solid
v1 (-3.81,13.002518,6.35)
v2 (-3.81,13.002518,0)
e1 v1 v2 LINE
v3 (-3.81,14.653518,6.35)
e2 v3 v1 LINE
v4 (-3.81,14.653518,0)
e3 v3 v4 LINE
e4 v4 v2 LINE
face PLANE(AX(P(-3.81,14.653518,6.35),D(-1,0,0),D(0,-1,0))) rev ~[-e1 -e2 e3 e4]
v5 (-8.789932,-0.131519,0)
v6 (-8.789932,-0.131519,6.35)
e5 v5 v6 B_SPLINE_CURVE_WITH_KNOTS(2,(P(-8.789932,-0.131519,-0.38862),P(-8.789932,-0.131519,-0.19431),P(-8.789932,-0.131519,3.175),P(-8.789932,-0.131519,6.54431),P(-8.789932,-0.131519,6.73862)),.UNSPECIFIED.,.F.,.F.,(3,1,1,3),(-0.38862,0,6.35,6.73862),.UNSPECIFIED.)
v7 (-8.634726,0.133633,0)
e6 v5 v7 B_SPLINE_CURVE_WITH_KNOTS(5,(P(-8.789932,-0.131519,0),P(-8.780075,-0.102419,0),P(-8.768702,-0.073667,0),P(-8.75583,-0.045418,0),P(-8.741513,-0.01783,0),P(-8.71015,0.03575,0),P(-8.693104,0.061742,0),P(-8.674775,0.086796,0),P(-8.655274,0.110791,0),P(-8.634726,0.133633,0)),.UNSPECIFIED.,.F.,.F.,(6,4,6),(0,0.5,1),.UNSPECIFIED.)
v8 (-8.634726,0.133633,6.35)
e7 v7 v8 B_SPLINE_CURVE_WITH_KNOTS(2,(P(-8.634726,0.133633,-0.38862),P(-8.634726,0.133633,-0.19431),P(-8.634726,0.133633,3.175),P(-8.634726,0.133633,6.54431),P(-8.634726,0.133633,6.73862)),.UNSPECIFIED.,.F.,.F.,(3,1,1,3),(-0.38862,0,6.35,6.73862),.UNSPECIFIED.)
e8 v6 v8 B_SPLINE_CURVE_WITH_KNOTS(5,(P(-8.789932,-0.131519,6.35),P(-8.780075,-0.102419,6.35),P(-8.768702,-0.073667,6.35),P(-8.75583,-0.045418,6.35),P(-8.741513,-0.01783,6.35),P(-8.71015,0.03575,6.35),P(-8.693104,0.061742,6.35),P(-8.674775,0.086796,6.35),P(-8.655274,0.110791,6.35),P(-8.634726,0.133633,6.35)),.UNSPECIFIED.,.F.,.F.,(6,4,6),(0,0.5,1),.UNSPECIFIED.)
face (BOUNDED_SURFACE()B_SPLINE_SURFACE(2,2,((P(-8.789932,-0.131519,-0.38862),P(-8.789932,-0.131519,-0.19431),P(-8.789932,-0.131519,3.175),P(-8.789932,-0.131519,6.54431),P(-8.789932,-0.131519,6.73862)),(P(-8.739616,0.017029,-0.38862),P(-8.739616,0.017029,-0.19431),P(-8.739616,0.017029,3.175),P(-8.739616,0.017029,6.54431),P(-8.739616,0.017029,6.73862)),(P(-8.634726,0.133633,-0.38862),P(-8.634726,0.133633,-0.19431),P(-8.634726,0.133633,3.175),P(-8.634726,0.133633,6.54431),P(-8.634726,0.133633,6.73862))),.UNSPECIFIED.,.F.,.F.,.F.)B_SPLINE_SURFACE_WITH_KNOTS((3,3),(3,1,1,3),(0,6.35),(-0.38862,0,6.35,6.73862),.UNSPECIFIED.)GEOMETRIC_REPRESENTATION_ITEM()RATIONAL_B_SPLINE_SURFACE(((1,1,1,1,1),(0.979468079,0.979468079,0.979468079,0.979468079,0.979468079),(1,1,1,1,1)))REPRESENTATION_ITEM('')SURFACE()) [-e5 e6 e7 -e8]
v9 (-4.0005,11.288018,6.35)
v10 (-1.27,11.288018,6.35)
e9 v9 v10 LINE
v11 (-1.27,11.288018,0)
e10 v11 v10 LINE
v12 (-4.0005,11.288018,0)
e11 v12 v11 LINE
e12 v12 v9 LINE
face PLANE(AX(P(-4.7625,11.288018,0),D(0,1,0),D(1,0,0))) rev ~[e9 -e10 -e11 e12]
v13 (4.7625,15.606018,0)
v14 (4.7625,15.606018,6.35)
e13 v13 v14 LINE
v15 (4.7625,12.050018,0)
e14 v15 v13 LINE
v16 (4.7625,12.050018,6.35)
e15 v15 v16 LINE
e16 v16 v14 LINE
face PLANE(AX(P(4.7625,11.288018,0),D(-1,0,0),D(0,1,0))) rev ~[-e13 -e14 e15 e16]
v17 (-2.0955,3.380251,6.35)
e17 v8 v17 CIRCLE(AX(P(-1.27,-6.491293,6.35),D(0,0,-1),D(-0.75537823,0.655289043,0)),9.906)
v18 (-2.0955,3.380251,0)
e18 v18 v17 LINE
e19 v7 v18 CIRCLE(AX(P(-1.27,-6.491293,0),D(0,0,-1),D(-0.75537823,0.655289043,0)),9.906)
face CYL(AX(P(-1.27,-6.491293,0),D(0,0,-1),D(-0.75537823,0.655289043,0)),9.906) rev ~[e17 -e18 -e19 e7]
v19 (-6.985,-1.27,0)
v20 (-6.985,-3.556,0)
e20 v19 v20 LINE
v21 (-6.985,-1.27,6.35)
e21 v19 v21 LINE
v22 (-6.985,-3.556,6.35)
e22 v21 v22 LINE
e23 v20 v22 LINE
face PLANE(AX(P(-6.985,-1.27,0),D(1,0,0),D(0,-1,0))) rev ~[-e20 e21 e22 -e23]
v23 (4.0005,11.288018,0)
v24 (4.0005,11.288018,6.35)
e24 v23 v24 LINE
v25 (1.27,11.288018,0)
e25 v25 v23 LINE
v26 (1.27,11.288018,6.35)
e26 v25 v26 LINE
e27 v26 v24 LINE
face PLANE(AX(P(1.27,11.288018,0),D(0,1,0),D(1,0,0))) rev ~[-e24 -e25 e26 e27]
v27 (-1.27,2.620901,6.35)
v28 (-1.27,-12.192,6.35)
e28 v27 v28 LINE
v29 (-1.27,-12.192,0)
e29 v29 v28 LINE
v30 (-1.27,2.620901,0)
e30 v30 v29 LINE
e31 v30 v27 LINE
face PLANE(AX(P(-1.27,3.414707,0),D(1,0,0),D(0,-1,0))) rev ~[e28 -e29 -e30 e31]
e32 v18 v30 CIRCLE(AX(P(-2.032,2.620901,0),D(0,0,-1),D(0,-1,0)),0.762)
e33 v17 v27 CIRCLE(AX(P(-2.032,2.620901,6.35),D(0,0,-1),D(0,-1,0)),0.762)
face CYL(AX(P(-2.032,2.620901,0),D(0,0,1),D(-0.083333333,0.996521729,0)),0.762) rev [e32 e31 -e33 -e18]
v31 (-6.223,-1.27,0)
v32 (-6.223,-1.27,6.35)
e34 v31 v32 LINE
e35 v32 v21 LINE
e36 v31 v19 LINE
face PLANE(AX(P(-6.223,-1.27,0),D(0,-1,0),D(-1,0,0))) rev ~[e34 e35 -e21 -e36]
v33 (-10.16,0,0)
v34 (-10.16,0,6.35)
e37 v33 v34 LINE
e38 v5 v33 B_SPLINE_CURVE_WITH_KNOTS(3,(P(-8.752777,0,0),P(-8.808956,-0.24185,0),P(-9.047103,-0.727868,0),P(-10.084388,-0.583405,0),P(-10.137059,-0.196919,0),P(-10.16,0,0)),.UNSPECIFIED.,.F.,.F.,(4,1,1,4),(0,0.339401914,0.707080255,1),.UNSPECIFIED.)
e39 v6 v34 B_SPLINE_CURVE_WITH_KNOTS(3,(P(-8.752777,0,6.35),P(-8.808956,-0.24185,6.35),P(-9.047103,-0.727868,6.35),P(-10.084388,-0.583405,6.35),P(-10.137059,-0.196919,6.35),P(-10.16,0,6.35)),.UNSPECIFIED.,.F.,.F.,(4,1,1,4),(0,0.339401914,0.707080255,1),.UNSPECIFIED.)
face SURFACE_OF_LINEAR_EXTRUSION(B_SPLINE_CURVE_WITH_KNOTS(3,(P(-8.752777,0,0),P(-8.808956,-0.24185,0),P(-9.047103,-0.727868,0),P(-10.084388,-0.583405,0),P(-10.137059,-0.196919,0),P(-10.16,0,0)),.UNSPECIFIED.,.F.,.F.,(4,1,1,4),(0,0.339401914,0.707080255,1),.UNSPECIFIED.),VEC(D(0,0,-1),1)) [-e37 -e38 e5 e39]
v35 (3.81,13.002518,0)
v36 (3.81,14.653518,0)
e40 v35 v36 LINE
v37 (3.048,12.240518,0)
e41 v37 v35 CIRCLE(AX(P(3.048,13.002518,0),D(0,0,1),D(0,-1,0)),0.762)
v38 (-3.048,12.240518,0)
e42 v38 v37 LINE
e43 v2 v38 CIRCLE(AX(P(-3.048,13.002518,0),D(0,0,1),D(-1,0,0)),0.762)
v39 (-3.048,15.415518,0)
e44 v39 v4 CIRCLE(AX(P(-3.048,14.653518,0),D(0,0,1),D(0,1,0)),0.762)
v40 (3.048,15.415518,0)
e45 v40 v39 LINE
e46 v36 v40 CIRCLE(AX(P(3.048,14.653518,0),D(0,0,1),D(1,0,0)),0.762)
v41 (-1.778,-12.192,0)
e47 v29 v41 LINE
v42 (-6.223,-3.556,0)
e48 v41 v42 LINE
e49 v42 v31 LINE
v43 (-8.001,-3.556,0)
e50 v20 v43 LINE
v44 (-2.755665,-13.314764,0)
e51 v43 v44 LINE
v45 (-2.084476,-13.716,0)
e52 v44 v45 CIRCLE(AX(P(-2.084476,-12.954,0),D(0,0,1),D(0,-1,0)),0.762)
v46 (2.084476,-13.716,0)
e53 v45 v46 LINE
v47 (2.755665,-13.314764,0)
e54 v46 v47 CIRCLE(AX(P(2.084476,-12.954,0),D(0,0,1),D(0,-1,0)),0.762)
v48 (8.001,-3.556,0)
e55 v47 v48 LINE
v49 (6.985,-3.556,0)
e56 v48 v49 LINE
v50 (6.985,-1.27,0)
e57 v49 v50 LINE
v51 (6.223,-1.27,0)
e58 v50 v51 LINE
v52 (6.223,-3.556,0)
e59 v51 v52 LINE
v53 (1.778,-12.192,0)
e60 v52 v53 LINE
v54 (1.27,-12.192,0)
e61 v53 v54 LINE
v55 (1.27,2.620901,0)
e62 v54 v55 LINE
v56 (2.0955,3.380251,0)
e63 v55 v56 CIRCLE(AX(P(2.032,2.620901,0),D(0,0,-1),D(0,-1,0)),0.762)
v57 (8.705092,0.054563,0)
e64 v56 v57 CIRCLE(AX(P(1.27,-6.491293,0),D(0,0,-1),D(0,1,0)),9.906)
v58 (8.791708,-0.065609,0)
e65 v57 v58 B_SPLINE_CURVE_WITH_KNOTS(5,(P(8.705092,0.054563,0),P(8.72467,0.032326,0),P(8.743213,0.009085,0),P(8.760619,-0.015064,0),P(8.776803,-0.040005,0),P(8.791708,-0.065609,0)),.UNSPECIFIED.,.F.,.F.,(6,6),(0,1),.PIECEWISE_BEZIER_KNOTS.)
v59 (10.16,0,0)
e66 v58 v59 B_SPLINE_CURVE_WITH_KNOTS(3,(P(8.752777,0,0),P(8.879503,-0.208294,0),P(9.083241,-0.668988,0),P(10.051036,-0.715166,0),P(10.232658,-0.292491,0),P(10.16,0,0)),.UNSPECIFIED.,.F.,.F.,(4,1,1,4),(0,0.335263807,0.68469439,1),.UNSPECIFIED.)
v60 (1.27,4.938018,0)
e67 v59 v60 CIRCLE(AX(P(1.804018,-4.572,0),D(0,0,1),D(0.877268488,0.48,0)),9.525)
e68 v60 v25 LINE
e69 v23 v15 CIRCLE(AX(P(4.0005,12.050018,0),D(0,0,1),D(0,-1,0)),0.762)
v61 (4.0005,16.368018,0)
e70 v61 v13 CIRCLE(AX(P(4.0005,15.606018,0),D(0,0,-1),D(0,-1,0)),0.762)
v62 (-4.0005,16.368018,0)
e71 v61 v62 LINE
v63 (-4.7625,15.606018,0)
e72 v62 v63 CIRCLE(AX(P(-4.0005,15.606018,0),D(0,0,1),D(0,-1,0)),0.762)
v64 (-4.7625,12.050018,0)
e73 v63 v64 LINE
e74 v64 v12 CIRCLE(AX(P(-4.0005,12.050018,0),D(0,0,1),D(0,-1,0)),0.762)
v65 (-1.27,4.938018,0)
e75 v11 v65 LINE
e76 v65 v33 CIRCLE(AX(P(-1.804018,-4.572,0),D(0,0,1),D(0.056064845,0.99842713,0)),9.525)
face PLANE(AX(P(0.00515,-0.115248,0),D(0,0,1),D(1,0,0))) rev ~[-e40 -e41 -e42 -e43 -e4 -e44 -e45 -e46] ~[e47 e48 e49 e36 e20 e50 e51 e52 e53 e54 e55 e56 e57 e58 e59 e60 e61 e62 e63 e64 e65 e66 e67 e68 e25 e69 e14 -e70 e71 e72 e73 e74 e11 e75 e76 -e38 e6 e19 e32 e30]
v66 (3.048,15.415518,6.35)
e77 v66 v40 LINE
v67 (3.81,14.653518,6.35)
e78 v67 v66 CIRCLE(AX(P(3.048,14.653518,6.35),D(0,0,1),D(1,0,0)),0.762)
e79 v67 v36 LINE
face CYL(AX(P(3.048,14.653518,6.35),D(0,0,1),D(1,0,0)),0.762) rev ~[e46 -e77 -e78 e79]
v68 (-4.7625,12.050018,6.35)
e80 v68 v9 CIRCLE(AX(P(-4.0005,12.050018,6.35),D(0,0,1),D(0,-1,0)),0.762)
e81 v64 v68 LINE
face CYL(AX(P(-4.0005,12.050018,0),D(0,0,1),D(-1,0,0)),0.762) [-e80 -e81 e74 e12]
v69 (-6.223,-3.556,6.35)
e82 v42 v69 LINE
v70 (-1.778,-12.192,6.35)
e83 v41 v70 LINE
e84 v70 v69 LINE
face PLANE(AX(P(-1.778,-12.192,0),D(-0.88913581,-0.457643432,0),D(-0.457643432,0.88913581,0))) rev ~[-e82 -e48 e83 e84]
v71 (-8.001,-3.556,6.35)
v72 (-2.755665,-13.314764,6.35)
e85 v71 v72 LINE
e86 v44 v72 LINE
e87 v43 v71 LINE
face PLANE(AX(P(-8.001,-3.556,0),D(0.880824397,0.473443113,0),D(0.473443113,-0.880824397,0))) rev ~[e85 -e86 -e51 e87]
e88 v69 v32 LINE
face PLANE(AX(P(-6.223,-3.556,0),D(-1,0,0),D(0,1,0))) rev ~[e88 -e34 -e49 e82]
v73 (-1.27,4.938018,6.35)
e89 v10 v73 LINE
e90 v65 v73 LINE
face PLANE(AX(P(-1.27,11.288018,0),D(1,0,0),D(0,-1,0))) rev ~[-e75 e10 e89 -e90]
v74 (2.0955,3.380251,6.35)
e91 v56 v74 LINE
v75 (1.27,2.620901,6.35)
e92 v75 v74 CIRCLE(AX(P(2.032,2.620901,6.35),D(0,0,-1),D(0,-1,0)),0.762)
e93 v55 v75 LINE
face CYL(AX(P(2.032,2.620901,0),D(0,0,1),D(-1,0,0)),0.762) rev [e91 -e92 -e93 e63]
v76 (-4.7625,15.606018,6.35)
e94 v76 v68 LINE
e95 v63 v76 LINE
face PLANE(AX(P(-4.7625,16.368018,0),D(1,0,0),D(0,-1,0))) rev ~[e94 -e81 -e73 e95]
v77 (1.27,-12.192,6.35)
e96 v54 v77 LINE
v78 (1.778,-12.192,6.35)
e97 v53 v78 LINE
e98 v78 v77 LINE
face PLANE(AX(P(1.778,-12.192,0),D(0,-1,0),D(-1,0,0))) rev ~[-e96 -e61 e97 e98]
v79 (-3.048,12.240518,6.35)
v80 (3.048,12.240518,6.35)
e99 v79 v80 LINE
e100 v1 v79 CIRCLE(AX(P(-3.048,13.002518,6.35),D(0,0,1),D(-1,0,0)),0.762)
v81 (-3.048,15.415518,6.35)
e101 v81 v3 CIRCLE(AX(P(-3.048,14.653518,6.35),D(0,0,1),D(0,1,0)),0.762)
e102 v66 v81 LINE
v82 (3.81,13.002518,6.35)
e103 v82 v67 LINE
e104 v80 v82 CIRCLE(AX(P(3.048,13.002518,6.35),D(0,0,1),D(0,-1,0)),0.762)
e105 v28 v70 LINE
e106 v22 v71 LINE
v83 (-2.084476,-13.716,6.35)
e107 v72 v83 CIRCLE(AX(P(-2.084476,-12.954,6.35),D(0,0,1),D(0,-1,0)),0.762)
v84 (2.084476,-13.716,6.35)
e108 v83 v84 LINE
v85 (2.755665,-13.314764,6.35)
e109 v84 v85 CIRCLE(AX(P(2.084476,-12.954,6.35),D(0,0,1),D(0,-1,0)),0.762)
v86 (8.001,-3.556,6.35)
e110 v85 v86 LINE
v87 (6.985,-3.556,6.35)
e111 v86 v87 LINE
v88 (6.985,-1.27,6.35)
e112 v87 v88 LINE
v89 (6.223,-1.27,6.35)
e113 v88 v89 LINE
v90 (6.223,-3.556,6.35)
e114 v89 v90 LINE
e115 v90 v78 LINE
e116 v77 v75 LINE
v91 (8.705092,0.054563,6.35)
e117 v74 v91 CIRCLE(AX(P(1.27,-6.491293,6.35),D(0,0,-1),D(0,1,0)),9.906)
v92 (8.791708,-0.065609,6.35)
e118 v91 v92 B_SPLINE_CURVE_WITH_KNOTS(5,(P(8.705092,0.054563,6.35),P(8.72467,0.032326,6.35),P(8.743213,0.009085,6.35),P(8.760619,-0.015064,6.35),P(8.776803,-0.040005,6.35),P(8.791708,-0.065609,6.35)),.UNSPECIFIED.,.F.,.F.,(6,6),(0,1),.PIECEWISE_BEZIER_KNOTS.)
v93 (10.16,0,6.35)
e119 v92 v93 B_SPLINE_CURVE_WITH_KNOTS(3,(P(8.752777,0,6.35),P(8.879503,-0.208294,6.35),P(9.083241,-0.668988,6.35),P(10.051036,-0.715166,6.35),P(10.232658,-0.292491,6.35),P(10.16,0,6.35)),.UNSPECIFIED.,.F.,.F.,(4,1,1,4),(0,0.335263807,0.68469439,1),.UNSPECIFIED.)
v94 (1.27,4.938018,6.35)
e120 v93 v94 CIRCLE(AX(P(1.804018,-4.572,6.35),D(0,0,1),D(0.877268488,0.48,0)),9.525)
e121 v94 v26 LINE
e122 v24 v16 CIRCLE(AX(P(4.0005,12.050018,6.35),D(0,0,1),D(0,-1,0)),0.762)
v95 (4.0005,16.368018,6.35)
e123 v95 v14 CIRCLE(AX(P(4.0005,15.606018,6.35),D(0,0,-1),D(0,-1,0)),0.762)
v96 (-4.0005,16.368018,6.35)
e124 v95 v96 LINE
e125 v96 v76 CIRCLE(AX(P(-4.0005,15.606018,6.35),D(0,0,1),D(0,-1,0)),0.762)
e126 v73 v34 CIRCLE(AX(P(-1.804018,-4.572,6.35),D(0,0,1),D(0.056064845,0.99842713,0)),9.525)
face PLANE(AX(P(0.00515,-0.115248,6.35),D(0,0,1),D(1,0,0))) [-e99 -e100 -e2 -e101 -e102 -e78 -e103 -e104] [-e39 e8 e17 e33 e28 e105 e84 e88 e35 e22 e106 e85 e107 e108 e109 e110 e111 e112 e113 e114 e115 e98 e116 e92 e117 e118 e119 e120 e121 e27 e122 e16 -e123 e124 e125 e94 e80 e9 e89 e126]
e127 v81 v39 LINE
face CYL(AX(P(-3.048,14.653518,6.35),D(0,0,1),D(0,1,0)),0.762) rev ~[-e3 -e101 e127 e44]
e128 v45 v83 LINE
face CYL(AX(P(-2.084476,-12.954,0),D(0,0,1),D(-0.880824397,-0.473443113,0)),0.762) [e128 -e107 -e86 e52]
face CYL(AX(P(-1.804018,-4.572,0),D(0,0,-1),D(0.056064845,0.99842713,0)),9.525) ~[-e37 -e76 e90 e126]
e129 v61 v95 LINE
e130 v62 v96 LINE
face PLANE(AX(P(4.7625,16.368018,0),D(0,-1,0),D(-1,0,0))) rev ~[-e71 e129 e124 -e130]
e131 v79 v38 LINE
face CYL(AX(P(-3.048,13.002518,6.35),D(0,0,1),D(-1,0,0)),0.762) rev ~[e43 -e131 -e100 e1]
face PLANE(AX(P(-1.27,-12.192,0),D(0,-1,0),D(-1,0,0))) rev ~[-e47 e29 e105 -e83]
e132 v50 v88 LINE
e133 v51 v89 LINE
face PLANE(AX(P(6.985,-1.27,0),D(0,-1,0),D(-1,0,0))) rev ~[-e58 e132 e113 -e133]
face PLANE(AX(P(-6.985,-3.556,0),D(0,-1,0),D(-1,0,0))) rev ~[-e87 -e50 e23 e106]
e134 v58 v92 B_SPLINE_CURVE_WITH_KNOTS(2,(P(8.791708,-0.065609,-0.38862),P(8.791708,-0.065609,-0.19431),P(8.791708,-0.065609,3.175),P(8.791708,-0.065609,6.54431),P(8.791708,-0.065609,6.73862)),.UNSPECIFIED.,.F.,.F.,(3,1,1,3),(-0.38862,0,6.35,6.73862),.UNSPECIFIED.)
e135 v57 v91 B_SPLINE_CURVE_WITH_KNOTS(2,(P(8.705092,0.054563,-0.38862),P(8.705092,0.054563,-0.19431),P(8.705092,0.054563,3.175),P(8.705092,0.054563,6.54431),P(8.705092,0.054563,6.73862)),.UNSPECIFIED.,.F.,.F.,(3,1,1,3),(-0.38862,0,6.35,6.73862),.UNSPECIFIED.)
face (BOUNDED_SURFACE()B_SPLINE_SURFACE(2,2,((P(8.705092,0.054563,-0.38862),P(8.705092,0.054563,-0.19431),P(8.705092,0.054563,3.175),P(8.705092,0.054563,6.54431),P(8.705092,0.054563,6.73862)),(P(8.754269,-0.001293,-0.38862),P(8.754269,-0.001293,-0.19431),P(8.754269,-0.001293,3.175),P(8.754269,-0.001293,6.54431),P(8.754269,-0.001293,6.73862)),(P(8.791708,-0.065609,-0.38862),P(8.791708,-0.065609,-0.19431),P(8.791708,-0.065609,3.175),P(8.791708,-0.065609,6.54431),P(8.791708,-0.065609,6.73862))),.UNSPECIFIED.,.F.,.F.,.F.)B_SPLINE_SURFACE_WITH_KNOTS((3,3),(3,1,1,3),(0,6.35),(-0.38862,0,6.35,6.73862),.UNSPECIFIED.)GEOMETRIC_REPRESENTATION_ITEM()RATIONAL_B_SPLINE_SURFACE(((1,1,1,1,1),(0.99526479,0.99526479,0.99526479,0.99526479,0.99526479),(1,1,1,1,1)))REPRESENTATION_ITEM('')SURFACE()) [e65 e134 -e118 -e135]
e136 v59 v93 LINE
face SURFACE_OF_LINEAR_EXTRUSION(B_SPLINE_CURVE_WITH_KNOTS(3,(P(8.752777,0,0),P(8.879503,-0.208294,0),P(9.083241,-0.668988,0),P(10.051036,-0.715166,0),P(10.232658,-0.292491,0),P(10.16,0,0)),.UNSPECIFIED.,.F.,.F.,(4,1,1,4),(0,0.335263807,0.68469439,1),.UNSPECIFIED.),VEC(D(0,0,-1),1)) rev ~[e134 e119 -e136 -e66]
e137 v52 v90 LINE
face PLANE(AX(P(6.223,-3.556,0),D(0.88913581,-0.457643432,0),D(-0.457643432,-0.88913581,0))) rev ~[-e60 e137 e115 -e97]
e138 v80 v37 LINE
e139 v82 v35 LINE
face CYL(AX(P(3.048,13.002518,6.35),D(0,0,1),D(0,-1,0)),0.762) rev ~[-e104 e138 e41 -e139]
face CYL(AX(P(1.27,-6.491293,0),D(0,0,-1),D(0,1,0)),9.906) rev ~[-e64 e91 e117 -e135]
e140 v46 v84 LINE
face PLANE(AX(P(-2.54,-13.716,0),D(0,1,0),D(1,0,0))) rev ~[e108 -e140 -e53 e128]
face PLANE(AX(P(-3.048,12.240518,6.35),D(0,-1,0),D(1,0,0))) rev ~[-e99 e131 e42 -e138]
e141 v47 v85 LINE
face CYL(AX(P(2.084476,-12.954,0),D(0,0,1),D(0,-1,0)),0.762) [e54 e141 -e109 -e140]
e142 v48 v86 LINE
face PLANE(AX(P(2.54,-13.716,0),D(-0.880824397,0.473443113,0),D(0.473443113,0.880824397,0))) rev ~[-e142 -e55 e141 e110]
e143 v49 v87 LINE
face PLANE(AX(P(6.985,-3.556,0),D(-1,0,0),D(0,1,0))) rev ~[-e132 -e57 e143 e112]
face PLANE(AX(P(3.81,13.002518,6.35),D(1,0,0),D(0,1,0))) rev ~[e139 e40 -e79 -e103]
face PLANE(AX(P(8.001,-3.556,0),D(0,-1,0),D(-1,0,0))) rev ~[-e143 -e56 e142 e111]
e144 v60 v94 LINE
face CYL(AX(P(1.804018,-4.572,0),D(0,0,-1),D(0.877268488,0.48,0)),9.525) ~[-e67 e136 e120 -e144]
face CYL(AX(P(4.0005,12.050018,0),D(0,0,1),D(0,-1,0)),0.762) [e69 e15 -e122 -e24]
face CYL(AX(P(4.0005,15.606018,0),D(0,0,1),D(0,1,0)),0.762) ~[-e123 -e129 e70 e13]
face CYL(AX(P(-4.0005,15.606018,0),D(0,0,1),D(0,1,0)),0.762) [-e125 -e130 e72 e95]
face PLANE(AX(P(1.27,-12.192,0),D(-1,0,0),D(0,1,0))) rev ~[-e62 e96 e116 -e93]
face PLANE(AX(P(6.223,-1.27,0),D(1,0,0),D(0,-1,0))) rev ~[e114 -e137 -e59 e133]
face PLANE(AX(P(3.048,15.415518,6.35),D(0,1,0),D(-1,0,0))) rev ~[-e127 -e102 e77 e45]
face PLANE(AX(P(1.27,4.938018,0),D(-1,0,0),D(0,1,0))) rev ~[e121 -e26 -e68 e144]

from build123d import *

# Parameters (mm, degrees)
F1_DEPTH = 6.35
F2_R     = 0.762
F4_DEPTH = 6.3510001


with BuildPart() as f1:
    # F0 (on Top) → F1 (new body)
    with BuildSketch(Plane.XY):
        with BuildLine():
            Line((4.7625, 16.3680184094), (-4.7625, 16.3680184094))
            Line((-4.7625, 16.3680184094), (-4.7625, 11.2880184094))
            Line((-4.7625, 11.2880184094), (-1.27, 11.2880184094))
            Line((-1.27, 11.2880184094), (-1.27, 4.9380184094))
            ThreePointArc((-1.27, 4.9380184094), (-6.4291435291, 3.7546941592), (-10.16, 0))
            add(Edge.make_bspline(
                [(-8.7527767482, 0), (-8.8089559621, -0.2418498758), (-9.0471031461, -0.7278683078), (-10.0843877691, -0.5834050266), (-10.1370594903, -0.1969189085), (-10.16, 0)],
                knots=[0, 0, 0, 0, 0.3394019143, 0.707080255, 1, 1, 1, 1], degree=3))
            ThreePointArc((-8.7527767482, 0), (-5.3825469605, 2.5206872974), (-1.27, 3.4147067439))
            Line((-1.27, 3.4147067439), (-1.27, -12.192))
            Line((-1.27, -12.192), (-1.778, -12.192))
            Line((-1.778, -12.192), (-6.223, -3.556))
            Line((-6.223, -3.556), (-6.223, -1.27))
            Line((-6.223, -1.27), (-6.985, -1.27))
            Line((-6.985, -1.27), (-6.985, -3.556))
            Line((-6.985, -3.556), (-8.001, -3.556))
            Line((-8.001, -3.556), (-2.54, -13.716))
            Line((-2.54, -13.716), (2.54, -13.716))
            Line((2.54, -13.716), (8.001, -3.556))
            Line((8.001, -3.556), (6.985, -3.556))
            Line((6.985, -3.556), (6.985, -1.27))
            Line((6.985, -1.27), (6.223, -1.27))
            Line((6.223, -1.27), (6.223, -3.556))
            Line((6.223, -3.556), (1.778, -12.192))
            Line((1.778, -12.192), (1.27, -12.192))
            Line((1.27, -12.192), (1.27, 3.4147067439))
            ThreePointArc((1.27, 3.4147067439), (5.3825469605, 2.5206872974), (8.7527767482, 0))
            add(Edge.make_bspline(
                [(8.7527767482, 0), (8.8795025593, -0.2082938871), (9.0832410123, -0.668988318), (10.0510359017, -0.7151657897), (10.232657896, -0.2924908845), (10.16, 0)],
                knots=[0, 0, 0, 0, 0.3352638068, 0.68469439, 1, 1, 1, 1], degree=3))
            ThreePointArc((10.16, 0), (6.4291435291, 3.7546941592), (1.27, 4.9380184094))
            Line((1.27, 4.9380184094), (1.27, 11.2880184094))
            Line((1.27, 11.2880184094), (4.7625, 11.2880184094))
            Line((4.7625, 11.2880184094), (4.7625, 16.3680184094))
        make_face()
    extrude(amount=F1_DEPTH)

    # F2
    f2_edges = [f1.edges().sort_by_distance(p)[0] for p in [
        (-2.54, -13.716, 3.175),
        (2.54, -13.716, 3.175),
        (-4.7625, 16.368018, 3.175),
        (-4.7625, 11.288018, 3.175),
        (4.7625, 16.368018, 3.175),
        (4.7625, 11.288018, 3.175),
        (1.27, 3.414707, 3.175),
        (8.752777, 0, 3.175),
        (-8.752777, 0, 3.175),
        (-1.27, 3.414707, 3.175),
    ]]
    fillet(f2_edges, radius=F2_R)

    # F3 (on face) → F4 (cut, through all)
    with BuildSketch(Plane.XY.offset(6.35)):
        with BuildLine():
            Line((-3.048, 12.2405184094), (3.048, 12.2405184094))
            ThreePointArc((3.048, 12.2405184094), (3.5868153673, 12.4637030421), (3.81, 13.0025184094))
            Line((3.81, 13.0025184094), (3.81, 14.6535184094))
            ThreePointArc((3.81, 14.6535184094), (3.5868153673, 15.1923337767), (3.048, 15.4155184094))
            Line((3.048, 15.4155184094), (-3.048, 15.4155184094))
            ThreePointArc((-3.048, 15.4155184094), (-3.5868153673, 15.1923337767), (-3.81, 14.6535184094))
            Line((-3.81, 14.6535184094), (-3.81, 13.0025184094))
            ThreePointArc((-3.81, 13.0025184094), (-3.5868153673, 12.4637030421), (-3.048, 12.2405184094))
        make_face()
    extrude(amount=-F4_DEPTH, mode=Mode.SUBTRACT)


solid = f1.part
